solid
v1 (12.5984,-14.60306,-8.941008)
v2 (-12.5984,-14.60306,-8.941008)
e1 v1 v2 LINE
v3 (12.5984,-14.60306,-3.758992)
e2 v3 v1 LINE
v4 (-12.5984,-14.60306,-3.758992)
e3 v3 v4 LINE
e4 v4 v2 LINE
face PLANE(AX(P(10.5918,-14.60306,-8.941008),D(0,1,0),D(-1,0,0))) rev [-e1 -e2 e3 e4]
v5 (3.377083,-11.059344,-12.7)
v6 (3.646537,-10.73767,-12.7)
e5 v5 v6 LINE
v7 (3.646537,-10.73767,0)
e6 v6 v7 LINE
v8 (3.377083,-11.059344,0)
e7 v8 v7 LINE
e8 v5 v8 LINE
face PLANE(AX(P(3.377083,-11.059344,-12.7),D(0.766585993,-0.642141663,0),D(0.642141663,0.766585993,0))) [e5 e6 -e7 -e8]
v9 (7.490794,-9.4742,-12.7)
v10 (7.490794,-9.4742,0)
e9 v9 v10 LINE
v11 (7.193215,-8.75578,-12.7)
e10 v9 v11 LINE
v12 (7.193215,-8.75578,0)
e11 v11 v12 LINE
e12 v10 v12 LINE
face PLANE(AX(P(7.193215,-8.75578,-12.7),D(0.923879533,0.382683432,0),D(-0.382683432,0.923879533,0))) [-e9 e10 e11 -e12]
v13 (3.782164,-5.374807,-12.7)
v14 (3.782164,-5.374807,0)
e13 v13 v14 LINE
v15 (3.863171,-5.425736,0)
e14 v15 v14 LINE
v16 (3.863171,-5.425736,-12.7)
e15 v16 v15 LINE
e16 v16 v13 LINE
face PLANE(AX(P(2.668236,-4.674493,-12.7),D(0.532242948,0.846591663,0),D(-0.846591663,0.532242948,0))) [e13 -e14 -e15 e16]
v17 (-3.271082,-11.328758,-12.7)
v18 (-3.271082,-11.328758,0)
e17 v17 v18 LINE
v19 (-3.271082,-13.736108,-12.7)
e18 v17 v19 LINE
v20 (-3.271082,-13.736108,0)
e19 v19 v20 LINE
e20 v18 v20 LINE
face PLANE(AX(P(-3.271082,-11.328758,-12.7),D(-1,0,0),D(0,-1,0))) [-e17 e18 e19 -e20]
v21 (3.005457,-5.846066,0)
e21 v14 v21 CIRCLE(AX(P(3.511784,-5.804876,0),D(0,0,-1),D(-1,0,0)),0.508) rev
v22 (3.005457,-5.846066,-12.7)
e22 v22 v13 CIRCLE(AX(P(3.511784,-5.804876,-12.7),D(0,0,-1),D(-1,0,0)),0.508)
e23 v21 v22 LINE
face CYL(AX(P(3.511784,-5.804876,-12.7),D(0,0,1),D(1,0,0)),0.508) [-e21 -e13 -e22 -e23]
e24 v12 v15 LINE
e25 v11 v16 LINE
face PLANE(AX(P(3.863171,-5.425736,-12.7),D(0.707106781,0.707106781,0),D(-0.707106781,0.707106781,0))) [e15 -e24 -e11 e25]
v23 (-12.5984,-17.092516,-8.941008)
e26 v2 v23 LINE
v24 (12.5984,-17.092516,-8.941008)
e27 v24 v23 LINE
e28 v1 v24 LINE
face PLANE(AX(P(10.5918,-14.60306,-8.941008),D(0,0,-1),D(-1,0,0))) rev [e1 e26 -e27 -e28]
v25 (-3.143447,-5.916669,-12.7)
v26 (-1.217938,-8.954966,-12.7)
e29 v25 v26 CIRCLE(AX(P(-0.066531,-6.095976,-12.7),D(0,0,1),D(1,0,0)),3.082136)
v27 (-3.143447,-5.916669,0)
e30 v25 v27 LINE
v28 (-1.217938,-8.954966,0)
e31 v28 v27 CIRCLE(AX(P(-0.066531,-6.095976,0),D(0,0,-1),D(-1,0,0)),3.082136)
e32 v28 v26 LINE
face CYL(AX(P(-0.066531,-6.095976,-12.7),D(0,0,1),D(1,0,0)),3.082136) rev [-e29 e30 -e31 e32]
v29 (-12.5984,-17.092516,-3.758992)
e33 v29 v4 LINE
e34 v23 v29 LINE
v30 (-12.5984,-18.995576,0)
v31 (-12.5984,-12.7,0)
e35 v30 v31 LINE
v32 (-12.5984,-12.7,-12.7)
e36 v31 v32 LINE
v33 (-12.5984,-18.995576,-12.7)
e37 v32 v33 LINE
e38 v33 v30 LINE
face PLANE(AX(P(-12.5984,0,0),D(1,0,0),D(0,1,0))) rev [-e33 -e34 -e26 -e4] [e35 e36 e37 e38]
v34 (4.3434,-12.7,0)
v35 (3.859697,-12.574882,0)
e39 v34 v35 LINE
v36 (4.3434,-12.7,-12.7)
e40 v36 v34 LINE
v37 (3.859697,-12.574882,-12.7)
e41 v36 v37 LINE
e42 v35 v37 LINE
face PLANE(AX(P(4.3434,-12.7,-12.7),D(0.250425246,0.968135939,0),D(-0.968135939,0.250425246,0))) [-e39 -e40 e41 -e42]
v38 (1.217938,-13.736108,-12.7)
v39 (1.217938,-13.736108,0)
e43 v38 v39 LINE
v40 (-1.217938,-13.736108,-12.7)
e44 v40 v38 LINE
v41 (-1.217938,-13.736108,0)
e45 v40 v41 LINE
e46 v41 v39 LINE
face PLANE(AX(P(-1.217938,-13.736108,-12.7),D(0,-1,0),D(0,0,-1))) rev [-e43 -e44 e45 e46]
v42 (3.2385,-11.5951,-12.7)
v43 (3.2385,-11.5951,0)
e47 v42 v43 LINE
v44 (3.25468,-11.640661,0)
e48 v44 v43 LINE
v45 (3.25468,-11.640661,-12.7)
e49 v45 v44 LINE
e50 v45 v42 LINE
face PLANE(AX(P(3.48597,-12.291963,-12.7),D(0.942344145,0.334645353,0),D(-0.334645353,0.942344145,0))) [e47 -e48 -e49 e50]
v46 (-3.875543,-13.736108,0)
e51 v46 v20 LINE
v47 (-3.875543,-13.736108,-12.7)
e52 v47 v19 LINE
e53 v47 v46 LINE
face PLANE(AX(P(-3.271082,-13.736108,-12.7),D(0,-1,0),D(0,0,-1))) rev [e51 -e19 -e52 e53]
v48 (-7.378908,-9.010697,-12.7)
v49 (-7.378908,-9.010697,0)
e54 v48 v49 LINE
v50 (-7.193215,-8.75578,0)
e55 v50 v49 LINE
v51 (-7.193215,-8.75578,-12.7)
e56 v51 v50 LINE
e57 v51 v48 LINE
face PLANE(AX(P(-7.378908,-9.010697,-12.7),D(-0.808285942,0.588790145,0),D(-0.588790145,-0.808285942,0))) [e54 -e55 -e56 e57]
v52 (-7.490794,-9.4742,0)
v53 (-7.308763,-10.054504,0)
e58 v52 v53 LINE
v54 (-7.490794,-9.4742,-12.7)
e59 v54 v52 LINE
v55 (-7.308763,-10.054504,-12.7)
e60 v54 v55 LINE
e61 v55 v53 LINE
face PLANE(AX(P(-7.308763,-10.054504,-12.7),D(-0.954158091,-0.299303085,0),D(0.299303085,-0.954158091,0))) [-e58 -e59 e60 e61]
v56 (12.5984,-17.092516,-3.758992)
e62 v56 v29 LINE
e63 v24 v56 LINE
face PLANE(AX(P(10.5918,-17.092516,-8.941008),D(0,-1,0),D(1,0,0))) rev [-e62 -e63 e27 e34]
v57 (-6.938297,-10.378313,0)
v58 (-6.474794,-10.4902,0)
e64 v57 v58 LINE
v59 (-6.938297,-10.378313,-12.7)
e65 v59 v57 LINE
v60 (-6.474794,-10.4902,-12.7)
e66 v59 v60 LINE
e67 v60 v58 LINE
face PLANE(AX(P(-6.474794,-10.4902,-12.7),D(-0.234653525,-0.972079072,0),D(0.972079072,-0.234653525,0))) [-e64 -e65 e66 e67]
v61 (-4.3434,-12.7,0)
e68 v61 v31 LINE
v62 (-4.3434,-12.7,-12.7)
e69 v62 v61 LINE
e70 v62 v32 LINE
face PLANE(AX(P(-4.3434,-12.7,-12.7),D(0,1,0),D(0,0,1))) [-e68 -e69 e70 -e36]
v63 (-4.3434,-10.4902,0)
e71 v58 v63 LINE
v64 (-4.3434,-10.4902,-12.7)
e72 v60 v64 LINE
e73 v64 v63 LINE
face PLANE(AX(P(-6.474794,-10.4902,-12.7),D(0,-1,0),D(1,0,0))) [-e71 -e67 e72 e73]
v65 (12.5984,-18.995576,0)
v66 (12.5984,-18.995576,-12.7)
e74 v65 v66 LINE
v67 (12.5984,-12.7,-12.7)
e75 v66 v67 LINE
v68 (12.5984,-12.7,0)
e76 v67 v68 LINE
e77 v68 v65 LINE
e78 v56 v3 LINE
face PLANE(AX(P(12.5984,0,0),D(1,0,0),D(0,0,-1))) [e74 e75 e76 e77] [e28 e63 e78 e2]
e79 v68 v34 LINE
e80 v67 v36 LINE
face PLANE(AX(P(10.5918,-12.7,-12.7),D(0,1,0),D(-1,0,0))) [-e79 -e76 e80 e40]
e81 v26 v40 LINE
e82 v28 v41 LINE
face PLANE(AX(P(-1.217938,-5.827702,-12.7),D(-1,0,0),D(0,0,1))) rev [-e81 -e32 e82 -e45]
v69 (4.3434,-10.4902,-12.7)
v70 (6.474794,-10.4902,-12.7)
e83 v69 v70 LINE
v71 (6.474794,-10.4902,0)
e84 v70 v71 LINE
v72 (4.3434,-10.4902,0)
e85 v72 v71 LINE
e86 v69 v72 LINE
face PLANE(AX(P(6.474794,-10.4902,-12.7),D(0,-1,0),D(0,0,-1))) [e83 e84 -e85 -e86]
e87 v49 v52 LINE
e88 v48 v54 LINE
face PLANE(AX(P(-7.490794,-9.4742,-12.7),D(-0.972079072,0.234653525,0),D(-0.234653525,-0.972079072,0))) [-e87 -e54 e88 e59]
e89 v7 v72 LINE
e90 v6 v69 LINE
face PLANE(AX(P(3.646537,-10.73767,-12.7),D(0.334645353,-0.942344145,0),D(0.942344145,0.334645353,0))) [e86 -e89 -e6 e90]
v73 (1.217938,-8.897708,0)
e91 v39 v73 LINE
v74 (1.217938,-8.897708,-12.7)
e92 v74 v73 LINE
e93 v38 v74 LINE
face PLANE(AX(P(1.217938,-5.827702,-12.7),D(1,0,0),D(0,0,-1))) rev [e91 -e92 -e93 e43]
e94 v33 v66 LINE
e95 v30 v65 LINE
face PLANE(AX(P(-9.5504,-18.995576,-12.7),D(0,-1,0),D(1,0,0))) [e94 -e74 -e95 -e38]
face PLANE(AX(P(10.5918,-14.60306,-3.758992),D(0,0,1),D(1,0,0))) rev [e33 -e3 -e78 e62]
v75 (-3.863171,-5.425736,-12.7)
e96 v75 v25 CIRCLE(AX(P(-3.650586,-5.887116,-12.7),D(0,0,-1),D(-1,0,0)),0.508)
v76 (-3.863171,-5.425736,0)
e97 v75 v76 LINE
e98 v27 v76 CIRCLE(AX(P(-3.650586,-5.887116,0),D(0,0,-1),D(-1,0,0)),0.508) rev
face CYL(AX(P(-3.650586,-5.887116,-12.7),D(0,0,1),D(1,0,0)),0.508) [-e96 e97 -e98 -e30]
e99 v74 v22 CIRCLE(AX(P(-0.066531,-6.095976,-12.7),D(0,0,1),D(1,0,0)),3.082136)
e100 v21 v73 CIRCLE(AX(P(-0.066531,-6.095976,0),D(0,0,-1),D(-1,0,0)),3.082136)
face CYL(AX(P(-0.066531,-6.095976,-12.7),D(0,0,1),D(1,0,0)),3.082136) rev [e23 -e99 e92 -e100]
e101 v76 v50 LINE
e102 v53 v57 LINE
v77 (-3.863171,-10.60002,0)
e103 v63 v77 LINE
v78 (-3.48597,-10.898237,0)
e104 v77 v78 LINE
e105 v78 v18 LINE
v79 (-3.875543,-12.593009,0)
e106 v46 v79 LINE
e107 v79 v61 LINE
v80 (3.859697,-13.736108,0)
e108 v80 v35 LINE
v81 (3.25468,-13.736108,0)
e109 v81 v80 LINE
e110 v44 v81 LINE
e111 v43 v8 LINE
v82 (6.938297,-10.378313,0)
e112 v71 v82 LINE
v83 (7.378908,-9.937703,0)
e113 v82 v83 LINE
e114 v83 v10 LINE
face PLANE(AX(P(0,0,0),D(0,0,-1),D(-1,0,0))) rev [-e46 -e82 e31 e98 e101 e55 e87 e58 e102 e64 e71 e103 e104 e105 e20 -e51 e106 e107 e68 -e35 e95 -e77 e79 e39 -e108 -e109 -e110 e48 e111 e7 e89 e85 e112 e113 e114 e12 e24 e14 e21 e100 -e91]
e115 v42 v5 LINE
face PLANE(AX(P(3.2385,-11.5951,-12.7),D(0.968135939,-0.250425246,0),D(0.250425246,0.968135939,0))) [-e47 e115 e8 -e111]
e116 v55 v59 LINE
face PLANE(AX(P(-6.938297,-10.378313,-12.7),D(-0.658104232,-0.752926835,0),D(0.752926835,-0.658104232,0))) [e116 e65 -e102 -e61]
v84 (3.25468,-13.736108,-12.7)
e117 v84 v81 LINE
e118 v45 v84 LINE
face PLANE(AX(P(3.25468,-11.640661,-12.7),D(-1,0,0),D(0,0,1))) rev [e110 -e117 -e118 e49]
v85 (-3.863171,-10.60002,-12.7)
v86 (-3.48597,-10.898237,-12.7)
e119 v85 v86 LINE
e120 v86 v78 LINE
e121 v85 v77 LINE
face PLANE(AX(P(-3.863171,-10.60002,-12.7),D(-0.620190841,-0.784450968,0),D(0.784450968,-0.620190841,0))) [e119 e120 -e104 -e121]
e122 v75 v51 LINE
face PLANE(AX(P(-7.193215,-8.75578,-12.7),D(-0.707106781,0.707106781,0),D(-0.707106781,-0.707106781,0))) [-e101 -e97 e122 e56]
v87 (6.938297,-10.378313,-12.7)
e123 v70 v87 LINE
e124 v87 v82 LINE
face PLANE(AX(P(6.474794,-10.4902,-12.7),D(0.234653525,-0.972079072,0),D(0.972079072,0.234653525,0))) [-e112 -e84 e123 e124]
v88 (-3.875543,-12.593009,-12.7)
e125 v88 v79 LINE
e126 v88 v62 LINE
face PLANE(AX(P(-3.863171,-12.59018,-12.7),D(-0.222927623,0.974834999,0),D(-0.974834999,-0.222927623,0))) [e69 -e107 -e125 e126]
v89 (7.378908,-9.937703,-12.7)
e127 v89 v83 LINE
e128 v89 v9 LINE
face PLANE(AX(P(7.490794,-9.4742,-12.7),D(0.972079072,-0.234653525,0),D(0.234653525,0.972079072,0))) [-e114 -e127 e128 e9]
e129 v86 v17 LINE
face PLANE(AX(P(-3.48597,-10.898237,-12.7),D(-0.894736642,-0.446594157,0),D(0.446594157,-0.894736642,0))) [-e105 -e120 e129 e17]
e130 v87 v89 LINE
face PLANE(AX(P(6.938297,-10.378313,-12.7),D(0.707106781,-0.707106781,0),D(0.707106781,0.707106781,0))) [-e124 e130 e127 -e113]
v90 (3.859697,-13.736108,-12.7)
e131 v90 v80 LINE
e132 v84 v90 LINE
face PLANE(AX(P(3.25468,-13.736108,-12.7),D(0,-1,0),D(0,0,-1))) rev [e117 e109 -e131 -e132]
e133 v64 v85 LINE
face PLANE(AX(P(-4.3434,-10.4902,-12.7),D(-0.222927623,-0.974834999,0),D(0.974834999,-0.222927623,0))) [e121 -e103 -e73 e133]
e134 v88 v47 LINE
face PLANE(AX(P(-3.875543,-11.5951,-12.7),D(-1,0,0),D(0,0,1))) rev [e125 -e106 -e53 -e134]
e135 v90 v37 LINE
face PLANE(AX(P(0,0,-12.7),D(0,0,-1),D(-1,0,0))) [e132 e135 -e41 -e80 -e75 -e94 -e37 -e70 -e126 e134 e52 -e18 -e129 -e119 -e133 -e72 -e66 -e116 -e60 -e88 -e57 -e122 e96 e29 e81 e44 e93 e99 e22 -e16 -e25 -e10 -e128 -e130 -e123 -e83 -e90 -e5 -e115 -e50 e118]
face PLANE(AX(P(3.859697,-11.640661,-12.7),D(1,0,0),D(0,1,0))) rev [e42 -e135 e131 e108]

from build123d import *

# Parameters (mm, degrees)
BOSS_EXTRUDE1_DEPTH     = 12.7
SKETCH10_R              = 3.082136138
CUT_EXTRUDE1_DEPTH      = 26.185474767
SKETCH11_W              = 2.435876878
SKETCH11_H              = 7.908405343
CUT_EXTRUDE2_DEPTH      = 26.185474767
CUT_EXTRUDE4_DEPTH      = 31.460304214
CUT_EXTRUDE4_DEPTH_BACK = 31.460304214
SKETCH13_W              = 5.182015338
SKETCH13_H              = 2.489456313
FILLET3_R               = 0.508
SKETCH17_W              = 0.605016918
SKETCH17_H              = 2.095446093
SKETCH17_W_2            = 0.604461085
SKETCH17_H_2            = 2.141007526
CUT_EXTRUDE7_DEPTH      = 26.185474767
SKETCH19_W              = 12.7
SKETCH19_H              = 6.295576116
BOSS_EXTRUDE2_DEPTH     = 3.048
SKETCH20_W              = 12.7
SKETCH20_H              = 6.295576116
BOSS_EXTRUDE3_DEPTH     = 2.0066
SKETCH22_W              = 5.182015338
SKETCH22_H              = 2.489456313
CUT_EXTRUDE8_DEPTH      = 35.014712144


with BuildPart() as part:
    # Sketch5 → Boss-Extrude1 (new body)
    with BuildSketch(Plane.XY):
        Polygon((-6.474794456, -10.4902), (-6.938297275, -10.378313453), (-7.308763147, -10.05450356), (-7.490794456, -9.4742), (-7.378907909, -9.01069718), (-7.193214945, -8.75577951), (-3.863171405, -5.42573597), (-2.833127272, -4.737482484), (-1.618107374, -4.4958), (1.618107374, -4.4958), (2.668236067, -4.674493152), (3.863171405, -5.42573597), (7.193214945, -8.75577951), (7.490794456, -9.4742), (7.378907909, -9.93770282), (6.938297275, -10.378313453), (6.474794456, -10.4902), (4.3434, -10.4902), (3.646537163, -10.737670005), (3.377082754, -11.059343535), (3.2385, -11.5951), (3.485970005, -12.291962837), (3.807643535, -12.561417246), (4.3434, -12.7), (10.5918, -12.7), (10.5918, -18.995576116), (-9.5504, -18.995576116), (-9.5504, -12.7), (-4.3434, -12.7), (-3.863171405, -12.590180165), (-3.485969976, -12.291962837), (-3.271081829, -11.861441531), (-3.271081829, -11.328758469), (-3.485969976, -10.898237163), (-3.863171405, -10.600019835), (-4.3434, -10.4902), align=None)
    extrude(amount=-BOSS_EXTRUDE1_DEPTH)

    # Sketch10 → Cut-Extrude1 (cut, through all)
    with BuildSketch(Plane.XY):
        with Locations((-0.066530556, -6.095976424)):
            Circle(SKETCH10_R)
    extrude(amount=-CUT_EXTRUDE1_DEPTH, mode=Mode.SUBTRACT)

    # Sketch11 → Cut-Extrude2 (cut, through all)
    with BuildSketch(Plane.XY):
        with Locations((0, -9.781904855)):
            Rectangle(SKETCH11_W, SKETCH11_H)
    extrude(amount=-CUT_EXTRUDE2_DEPTH, mode=Mode.SUBTRACT)

    # Sketch13 → Cut-Extrude4 (cut, two sides: drawn at the far end of the back side and taken through both)
    with BuildSketch(Plane.ZY.offset(9.5504).offset(-CUT_EXTRUDE4_DEPTH_BACK)):
        with Locations((-6.35, -15.847788058)):
            Rectangle(SKETCH13_W, SKETCH13_H)
    extrude(amount=CUT_EXTRUDE4_DEPTH + CUT_EXTRUDE4_DEPTH_BACK, mode=Mode.SUBTRACT)

    # Fillet3
    # the kernel refuses this fillet: 0.508 mm, written as the material it takes off along each edge
    with BuildSketch(Plane(origin=(2.668236067, -4.674493152, 3.28944818), x_dir=(0.8465916632907231, -0.5322429479538896, 0), z_dir=(0, 0, -1))) as fillet3_piece_1:
        with BuildLine():
            CenterArc((1.315779272, 0.508), FILLET3_R, 143.192029884, 126.807970116)
            Line((0.90905007, 0.812360569), (0.900915486, 0.81844778))
            ThreePointArc((0.900915486, 0.81844778), (0.488321858, 0.368360866), (-0.005137978, 0.008765089))
            Line((-0.005137978, 0.008765089), (0, -0.01016))
            Line((0, -0.01016), (1.315779272, -0.01016))
            Line((1.315779272, -0.01016), (1.315779272, 0))
        make_face()
    extrude(amount=19.278896361, mode=Mode.SUBTRACT)
    with BuildSketch(Plane(origin=(-2.833127272, -4.737482484, 3.097058862), x_dir=(-0.2544986167721869, -0.9670731379068719, 0), z_dir=(0, 0, -1))) as fillet3_piece_2:
        with BuildLine():
            CenterArc((1.319821852, 0.497962426), FILLET3_R, 140.517787887, 118.073467257)
            Line((0.927736265, 0.820968451), (0.919894553, 0.827428572))
            ThreePointArc((0.919894553, 0.827428572), (0.4571351, 0.418092896), (-0.006733033, 0.007608671))
            Line((-0.006733033, 0.007608671), (0.002009719, -0.009959249))
            ThreePointArc((0.002009719, -0.009959249), (0.60966796, 0.050739942), (1.217326201, -0.009959249))
            Line((1.217326201, -0.009959249), (1.219335919, 0))
        make_face()
    extrude(amount=18.894117724, mode=Mode.SUBTRACT)

    # Sketch17 → Cut-Extrude7 (cut, through all)
    with BuildSketch(Plane.XY):
        with Locations((3.55718824, -12.68838448)):
            Rectangle(SKETCH17_W, SKETCH17_H)
        with Locations((-3.573312372, -12.665603763)):
            Rectangle(SKETCH17_W_2, SKETCH17_H_2)
    extrude(amount=-CUT_EXTRUDE7_DEPTH, mode=Mode.SUBTRACT)

    # Sketch19 → Boss-Extrude2 (add)
    with BuildSketch(Plane.ZY.offset(9.5504)):
        with Locations((-6.35, -15.847788058)):
            Rectangle(SKETCH19_W, SKETCH19_H)
    extrude(amount=BOSS_EXTRUDE2_DEPTH)

    # Sketch20 → Boss-Extrude3 (add)
    with BuildSketch(Plane(origin=(10.5918, 0, 0), x_dir=(0, 0, -1), z_dir=(1, 0, 0))):
        with Locations((6.35, -15.847788058)):
            Rectangle(SKETCH20_W, SKETCH20_H)
    extrude(amount=BOSS_EXTRUDE3_DEPTH)

    # Sketch22 → Cut-Extrude8 (cut, through all)
    with BuildSketch(Plane.ZY.offset(12.5984)):
        with Locations((-6.35, -15.847788058)):
            Rectangle(SKETCH22_W, SKETCH22_H)
    extrude(amount=-CUT_EXTRUDE8_DEPTH, mode=Mode.SUBTRACT)


solid = part.part
